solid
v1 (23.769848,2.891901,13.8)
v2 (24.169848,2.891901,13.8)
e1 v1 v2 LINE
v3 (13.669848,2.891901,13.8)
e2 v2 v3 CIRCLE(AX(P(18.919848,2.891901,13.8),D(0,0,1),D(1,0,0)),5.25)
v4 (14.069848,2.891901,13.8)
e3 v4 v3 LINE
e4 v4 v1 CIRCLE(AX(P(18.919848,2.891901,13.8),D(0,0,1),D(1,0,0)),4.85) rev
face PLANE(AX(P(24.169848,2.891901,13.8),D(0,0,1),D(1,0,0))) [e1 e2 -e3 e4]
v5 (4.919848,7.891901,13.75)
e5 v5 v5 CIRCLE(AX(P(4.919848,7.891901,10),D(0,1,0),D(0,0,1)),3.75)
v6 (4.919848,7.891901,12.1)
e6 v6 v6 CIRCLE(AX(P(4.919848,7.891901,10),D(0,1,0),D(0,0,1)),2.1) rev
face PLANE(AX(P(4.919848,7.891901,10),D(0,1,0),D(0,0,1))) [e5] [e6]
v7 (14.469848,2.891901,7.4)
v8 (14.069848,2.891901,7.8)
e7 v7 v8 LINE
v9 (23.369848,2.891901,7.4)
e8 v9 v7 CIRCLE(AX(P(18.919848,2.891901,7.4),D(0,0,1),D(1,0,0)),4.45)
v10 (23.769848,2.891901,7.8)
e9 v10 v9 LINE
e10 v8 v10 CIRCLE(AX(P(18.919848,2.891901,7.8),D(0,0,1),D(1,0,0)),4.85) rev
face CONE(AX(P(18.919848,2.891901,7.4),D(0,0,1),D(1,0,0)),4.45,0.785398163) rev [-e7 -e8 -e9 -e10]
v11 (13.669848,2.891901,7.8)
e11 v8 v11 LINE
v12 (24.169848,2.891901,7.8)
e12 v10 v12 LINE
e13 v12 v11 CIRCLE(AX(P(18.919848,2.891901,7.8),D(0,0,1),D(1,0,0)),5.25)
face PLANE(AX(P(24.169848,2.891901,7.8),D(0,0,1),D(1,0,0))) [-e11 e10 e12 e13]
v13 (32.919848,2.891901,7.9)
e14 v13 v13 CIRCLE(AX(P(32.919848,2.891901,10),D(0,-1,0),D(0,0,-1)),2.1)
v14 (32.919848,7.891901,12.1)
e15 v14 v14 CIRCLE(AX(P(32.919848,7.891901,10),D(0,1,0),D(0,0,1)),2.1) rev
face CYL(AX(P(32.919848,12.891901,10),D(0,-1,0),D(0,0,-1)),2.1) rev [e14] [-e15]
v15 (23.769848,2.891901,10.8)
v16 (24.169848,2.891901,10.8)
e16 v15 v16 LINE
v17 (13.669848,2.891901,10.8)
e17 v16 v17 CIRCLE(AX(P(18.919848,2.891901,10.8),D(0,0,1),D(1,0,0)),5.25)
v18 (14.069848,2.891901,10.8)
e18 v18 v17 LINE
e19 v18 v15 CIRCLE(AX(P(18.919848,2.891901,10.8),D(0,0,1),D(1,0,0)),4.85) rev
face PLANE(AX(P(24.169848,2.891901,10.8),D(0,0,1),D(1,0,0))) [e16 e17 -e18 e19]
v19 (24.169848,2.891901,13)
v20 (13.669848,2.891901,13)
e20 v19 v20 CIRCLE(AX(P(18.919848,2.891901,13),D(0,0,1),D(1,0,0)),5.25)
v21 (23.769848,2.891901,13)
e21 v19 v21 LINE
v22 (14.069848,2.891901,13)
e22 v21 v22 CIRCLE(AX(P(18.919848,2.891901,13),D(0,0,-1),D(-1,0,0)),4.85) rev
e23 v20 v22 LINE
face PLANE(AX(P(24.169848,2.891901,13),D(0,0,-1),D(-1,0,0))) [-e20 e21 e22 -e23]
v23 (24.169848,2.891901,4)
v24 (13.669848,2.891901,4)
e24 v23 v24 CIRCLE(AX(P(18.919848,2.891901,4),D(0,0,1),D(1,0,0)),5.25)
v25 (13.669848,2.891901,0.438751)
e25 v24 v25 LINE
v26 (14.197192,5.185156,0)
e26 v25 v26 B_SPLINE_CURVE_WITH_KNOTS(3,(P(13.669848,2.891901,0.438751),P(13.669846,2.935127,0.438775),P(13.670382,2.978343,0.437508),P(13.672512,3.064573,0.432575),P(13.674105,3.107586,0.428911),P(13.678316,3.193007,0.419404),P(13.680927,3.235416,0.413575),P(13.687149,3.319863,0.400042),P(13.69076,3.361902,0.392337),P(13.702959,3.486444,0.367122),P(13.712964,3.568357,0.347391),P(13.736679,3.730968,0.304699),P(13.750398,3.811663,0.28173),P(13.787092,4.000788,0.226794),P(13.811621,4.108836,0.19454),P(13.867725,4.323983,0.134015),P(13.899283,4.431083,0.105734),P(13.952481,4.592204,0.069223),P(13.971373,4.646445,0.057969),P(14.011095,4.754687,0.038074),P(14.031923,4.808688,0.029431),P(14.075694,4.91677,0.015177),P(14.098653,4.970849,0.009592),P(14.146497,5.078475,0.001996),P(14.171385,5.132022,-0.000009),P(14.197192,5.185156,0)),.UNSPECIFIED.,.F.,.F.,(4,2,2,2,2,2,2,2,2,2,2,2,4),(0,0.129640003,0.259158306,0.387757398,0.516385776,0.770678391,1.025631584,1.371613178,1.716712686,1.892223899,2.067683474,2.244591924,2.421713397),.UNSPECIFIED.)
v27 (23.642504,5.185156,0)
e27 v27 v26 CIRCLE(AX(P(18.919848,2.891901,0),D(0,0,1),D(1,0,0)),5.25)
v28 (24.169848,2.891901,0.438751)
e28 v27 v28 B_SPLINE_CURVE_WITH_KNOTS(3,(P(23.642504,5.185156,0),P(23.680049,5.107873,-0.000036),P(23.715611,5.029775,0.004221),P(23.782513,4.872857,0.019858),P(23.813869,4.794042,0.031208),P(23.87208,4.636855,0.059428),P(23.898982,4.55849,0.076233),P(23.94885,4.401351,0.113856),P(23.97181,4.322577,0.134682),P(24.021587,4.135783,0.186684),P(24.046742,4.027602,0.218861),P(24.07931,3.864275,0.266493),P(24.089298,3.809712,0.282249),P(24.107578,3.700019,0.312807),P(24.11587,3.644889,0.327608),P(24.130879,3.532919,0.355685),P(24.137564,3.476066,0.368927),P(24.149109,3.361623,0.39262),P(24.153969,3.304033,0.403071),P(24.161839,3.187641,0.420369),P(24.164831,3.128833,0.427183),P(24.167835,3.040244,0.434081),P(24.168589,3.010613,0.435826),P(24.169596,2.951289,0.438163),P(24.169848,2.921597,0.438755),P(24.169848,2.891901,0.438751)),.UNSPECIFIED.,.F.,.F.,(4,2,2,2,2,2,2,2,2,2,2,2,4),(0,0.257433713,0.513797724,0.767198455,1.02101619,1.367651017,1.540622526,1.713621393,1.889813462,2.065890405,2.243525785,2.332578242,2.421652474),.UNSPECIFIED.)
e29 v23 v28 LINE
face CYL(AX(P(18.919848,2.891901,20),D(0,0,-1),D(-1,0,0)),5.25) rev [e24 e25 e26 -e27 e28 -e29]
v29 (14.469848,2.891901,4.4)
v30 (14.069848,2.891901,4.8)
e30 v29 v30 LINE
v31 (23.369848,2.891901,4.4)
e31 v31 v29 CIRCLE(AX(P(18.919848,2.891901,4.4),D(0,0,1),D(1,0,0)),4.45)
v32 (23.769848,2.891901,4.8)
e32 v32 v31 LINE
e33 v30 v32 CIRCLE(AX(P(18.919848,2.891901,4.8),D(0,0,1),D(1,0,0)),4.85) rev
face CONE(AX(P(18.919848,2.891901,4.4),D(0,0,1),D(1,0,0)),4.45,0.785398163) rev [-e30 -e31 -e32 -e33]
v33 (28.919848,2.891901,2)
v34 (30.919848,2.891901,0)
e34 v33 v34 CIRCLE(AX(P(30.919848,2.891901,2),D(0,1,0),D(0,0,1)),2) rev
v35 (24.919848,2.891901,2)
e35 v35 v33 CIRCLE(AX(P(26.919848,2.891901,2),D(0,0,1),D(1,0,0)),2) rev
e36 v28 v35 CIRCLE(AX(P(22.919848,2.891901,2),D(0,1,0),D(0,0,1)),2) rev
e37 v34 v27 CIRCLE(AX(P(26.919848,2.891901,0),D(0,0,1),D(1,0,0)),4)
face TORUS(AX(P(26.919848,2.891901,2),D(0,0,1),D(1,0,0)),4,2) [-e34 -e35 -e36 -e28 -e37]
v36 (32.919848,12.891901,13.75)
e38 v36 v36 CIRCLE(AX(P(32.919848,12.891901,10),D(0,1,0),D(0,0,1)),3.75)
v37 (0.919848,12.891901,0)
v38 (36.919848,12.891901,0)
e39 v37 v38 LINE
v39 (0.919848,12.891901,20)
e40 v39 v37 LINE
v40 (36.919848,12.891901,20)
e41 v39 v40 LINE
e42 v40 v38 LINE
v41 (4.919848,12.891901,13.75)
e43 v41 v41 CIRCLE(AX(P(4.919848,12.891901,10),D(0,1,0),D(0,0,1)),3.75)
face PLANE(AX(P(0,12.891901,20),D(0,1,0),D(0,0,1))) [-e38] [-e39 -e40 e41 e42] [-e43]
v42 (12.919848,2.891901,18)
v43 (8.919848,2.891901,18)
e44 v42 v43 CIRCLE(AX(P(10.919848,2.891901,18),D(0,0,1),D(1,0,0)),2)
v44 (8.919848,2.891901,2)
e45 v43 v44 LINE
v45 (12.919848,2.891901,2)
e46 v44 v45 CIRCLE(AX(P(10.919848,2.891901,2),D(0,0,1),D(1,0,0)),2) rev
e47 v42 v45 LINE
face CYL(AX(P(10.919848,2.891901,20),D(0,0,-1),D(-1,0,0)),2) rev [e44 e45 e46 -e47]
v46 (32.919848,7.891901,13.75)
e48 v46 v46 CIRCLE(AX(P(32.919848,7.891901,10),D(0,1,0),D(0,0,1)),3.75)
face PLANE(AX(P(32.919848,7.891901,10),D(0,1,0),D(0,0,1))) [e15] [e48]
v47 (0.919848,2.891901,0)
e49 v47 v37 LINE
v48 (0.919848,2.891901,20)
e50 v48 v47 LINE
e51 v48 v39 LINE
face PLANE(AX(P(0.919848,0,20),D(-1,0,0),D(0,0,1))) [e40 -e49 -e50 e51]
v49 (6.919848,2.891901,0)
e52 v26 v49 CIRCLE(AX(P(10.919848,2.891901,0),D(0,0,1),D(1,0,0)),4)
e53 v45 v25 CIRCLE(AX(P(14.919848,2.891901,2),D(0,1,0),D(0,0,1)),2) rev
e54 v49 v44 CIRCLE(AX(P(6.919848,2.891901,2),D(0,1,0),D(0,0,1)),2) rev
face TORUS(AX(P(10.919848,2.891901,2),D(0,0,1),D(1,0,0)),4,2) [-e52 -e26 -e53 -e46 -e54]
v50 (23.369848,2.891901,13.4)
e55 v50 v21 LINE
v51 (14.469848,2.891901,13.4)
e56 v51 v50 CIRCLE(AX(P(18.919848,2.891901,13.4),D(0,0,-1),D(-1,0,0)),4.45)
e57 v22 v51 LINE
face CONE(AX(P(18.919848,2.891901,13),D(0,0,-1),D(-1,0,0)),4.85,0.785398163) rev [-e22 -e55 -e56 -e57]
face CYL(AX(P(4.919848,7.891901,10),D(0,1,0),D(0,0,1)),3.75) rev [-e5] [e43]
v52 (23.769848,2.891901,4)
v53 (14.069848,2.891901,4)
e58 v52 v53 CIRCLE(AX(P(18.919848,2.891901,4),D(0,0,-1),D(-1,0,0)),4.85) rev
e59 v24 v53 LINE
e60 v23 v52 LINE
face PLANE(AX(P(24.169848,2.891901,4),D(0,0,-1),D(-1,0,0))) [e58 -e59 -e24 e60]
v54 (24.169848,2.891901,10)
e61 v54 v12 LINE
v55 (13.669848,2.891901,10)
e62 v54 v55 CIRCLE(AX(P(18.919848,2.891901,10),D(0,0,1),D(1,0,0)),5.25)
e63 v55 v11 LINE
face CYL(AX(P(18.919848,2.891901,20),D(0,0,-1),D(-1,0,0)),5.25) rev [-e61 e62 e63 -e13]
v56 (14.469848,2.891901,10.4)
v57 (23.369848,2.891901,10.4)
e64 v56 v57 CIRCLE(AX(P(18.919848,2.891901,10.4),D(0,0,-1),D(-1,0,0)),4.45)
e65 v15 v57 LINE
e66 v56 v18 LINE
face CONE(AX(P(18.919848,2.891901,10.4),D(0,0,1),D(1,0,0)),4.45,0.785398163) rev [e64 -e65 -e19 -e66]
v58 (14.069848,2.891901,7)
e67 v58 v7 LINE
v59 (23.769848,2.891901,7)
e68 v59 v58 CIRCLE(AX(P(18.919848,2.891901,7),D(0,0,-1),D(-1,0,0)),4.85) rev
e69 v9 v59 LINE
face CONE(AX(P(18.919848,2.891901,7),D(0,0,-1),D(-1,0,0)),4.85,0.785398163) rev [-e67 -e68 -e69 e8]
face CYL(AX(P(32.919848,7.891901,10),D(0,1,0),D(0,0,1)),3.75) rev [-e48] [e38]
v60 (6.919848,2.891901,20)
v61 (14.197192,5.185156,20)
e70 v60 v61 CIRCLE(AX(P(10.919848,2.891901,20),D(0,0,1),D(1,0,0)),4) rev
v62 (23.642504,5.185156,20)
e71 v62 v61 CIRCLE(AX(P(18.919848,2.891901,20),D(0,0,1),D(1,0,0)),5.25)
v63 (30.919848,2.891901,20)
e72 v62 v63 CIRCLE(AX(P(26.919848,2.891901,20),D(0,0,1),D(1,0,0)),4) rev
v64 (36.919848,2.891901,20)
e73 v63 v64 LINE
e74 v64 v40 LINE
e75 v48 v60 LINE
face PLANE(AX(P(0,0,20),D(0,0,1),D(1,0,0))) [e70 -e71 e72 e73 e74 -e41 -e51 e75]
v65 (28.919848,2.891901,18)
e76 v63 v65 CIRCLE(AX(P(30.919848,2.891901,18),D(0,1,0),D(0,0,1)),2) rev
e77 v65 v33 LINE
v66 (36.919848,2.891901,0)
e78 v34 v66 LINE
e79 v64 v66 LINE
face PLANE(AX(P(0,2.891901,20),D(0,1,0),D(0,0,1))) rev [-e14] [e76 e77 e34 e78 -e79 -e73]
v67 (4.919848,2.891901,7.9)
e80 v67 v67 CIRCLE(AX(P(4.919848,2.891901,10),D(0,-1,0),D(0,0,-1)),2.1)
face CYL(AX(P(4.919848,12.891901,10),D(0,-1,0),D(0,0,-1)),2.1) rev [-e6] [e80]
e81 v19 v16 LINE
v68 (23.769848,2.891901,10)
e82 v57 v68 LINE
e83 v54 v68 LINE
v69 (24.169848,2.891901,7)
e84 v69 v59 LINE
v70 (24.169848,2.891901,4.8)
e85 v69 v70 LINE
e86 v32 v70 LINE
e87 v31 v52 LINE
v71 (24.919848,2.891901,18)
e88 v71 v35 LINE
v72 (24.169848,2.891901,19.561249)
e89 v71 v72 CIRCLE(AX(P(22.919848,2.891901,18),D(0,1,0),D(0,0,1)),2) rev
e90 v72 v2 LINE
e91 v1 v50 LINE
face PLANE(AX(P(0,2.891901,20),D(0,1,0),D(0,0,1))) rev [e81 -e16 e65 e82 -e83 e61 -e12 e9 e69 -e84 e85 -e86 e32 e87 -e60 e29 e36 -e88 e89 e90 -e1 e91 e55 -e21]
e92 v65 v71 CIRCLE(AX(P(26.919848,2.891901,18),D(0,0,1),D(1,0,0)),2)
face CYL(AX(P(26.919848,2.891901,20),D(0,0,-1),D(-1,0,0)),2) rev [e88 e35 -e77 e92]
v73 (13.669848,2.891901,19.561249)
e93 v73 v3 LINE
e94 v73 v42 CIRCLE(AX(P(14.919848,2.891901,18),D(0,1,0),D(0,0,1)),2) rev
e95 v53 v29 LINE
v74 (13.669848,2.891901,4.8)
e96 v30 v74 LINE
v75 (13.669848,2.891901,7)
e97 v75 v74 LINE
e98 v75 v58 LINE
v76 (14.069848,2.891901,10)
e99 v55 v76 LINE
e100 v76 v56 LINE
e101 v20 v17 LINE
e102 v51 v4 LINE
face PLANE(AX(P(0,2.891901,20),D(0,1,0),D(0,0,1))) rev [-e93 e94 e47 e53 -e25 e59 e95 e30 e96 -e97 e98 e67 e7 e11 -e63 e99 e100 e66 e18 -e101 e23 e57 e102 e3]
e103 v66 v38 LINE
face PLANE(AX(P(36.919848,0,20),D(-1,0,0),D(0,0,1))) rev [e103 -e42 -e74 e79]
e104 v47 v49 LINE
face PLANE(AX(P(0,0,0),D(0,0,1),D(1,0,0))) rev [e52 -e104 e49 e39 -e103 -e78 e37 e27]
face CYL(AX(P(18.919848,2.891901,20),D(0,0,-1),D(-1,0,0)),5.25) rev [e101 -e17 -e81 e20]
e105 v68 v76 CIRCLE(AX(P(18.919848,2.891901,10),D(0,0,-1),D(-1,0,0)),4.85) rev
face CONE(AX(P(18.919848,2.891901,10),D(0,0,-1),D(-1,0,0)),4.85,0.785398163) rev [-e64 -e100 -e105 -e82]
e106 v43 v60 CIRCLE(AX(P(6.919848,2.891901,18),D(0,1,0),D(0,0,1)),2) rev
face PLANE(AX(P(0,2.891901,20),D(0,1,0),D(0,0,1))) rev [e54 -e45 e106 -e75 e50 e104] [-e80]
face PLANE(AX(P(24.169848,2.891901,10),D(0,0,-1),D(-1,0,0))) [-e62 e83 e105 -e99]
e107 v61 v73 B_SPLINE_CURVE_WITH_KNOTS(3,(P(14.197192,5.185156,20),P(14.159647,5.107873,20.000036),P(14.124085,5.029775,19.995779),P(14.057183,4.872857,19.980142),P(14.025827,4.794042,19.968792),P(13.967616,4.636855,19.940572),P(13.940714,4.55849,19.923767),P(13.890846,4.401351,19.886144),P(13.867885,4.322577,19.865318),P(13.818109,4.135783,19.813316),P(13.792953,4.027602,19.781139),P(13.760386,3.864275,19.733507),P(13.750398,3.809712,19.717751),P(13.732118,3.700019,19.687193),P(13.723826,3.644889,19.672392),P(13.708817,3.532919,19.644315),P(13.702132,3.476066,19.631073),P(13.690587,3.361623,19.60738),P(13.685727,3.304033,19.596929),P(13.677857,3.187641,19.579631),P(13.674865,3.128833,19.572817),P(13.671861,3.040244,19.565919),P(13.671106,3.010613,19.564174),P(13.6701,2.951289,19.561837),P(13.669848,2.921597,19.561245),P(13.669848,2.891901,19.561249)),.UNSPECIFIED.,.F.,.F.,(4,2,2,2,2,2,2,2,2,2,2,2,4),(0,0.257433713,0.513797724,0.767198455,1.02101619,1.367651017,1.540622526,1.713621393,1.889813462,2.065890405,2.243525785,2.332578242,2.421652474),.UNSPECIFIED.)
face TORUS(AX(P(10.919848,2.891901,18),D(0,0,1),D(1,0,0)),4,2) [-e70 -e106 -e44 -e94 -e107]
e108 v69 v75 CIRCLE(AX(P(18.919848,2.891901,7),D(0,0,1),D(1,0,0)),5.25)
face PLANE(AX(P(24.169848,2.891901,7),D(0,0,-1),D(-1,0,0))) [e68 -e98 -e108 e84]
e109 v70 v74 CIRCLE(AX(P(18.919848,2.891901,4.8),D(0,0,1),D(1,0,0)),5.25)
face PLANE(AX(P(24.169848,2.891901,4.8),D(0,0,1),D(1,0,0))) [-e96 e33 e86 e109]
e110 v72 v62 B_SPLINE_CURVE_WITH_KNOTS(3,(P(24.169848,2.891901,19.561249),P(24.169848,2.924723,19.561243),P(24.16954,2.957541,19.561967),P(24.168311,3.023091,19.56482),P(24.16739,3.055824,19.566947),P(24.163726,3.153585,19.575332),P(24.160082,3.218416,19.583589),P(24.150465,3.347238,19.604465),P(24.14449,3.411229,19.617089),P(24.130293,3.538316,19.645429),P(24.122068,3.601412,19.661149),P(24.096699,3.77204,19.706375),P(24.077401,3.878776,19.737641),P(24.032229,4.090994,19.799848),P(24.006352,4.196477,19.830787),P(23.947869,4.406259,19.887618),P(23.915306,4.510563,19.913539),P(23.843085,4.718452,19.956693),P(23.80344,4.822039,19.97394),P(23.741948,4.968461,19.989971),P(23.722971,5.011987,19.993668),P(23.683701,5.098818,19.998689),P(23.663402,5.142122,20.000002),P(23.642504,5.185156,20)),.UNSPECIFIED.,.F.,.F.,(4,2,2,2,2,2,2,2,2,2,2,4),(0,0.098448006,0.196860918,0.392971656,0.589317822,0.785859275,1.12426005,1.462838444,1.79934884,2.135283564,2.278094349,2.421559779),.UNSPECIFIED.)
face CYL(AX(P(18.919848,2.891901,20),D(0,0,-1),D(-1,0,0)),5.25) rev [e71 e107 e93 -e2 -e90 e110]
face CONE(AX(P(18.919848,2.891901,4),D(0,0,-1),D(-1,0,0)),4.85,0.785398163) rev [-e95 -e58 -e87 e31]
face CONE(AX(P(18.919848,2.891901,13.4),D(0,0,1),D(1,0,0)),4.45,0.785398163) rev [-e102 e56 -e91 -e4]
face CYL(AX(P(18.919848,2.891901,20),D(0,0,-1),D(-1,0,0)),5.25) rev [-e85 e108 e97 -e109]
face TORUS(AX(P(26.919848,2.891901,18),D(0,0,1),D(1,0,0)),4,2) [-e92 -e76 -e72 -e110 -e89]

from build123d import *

# Parameters (mm, degrees)
BOSS_EXTRUDE1_DEPTH = 20
SKETCH2_W           = 0.8000000000000007
SKETCH2_H           = 0.7999999999999989
SKETCH2_H_2         = 0.8000000000000007
CHAMFER1_SIZE       = 0.4
FILLET2_R           = 2
SKETCH3_R           = 2.100000000000004
SKETCH3_R_2         = 2.100000000000001
CUT_EXTRUDE1_DEPTH  = 44.163354633534205
SKETCH4_R           = 3.7499999999999996
SKETCH4_R_2         = 3.750000000000006
CUT_EXTRUDE2_DEPTH  = 5


# Some blends are built 0.0001 mm under size
with BuildPart() as part:
    # Sketch1 → Boss-Extrude1 (new body)
    with BuildSketch(Plane.XY):
        with BuildLine():
            Line((0.9198479389646088, 12.89190109356241), (0.9198479389646088, 2.89190109356241))
            Line((0.9198479389646081, 2.89190109356241), (8.919847938964608, 2.89190109356241))
            ThreePointArc((8.919847938964608, 2.8919010935624105), (10.919847938964608, 4.89190109356241), (12.919847938964608, 2.89190109356241))
            Line((12.919847938964608, 2.89190109356241), (13.669847938964606, 2.89190109356241))
            ThreePointArc((13.669847938964608, 2.8919010935624114), (18.919847938964608, 8.14190109356241), (24.169847938964608, 2.89190109356241))
            Line((24.169847938964608, 2.89190109356241), (24.919847938964608, 2.89190109356241))
            ThreePointArc((24.919847938964608, 2.8919010935624105), (26.919847938964608, 4.891901093562406), (28.919847938964608, 2.89190109356241))
            Line((28.919847938964605, 2.89190109356241), (36.91984793896461, 2.89190109356241))
            Line((36.91984793896461, 2.89190109356241), (36.91984793896461, 12.89190109356241))
            Line((36.91984793896461, 12.89190109356241), (0.9198479389646088, 12.89190109356241))
        make_face()
    extrude(amount=BOSS_EXTRUDE1_DEPTH)

    # Sweep2: sweep along a curve in space
    with BuildLine() as sweep2_path:
        ThreePointArc((24.169847938964608, 2.89190109356241, 20), (22.632158540193984, 6.604211694791784, 20), (18.919847938964608, 8.141901093562412, 20))
        ThreePointArc((18.919847938964608, 8.141901093562412, 20), (15.207537337735232, 6.604211694791786, 20), (13.669847938964606, 2.89190109356241, 20))
    # Sketch2 → Sweep2 (sweep)
    with BuildSketch(Plane.XZ.offset(-2.89190109356241)):
        with Locations((14.069847938964607, 13.400000000000006)):
            Rectangle(SKETCH2_W, SKETCH2_H)
        with Locations((14.069847938964607, 10.400000000000004)):
            Rectangle(SKETCH2_W, SKETCH2_H_2)
        with Locations((14.069847938964607, 7.400000000000003)):
            Rectangle(SKETCH2_W, SKETCH2_H_2)
        Polygon((13.669847938964608, 4.8000000000000025), (14.469847938964607, 4.8000000000000025), (14.469847938964609, 4.000000000000002), (13.669847938964608, 4.000000000000002), align=None)
    sweep(path=sweep2_path.line)

    # Chamfer1
    chamfer1_edges = [part.edges().sort_by_distance(p)[0] for p in [
        (18.919847938964608, 7.341901093562408, 4.000000000000002),
        (18.919847938964608, 7.341901093562411, 4.8000000000000025),
        (18.919847938964608, 7.341901093562411, 7.0000000000000036),
        (18.919847938964608, 7.341901093562413, 7.800000000000004),
        (18.919847938964608, 7.341901093562413, 13.800000000000004),
        (18.919847938964608, 7.341901093562411, 13.000000000000005),
        (18.919847938964608, 7.341901093562413, 10.800000000000004),
        (18.919847938964608, 7.341901093562411, 10.000000000000004),
    ]]
    chamfer(chamfer1_edges, length=CHAMFER1_SIZE - 0.0001)  # a hair under: the kernel refuses the full size

    # Fillet2
    # the kernel refuses this fillet: 2 mm, written as the material it takes off along each edge
    with BuildSketch(Plane(origin=(10.919847938964608, 2.89190109356241, 0), x_dir=(-0.003141587485879782, -0.9999950652018582, 0), z_dir=(0.9999950652018582, -0.003141587485879782, 0))) as fillet2_piece_1:
        with BuildLine():
            CenterArc((2 + FILLET2_R, -FILLET2_R), FILLET2_R, 89.99999999999997, 90)
            Line((2 + FILLET2_R, 2.2e-16), (2, 0))
            Line((2, 0), (2, -FILLET2_R))
        make_face()
    revolve(axis=Axis((10.919847938964608, 2.89190109356241, 0), (0, 0, -1)), revolution_arc=359.64000000000004, mode=Mode.SUBTRACT)
    with BuildSketch(Plane(origin=(26.919847938964608, 2.8919010935624057, 0), x_dir=(-0.003141587485879782, -0.9999950652018582, 0), z_dir=(0.9999950652018582, -0.003141587485879782, 0))) as fillet2_piece_2:
        with BuildLine():
            CenterArc((1.9999999999999987 + FILLET2_R, -FILLET2_R), FILLET2_R, 90, 90)
            Line((1.999999999999998, -FILLET2_R), (1.9999999999999987, 0))
            Line((1.9999999999999987, 0), (1.9999999999999987 + FILLET2_R, 0))
        make_face()
    revolve(axis=Axis((26.919847938964608, 2.8919010935624057, 0), (0, 0, -1)), revolution_arc=359.64, mode=Mode.SUBTRACT)
    with BuildSketch(Plane(origin=(10.919847938964608, 2.89190109356241, 20), x_dir=(-0.003141587485879782, -0.9999950652018582, 0), z_dir=(0.9999950652018582, -0.003141587485879782, 0))) as fillet2_piece_3:
        with BuildLine():
            CenterArc((1.9999999999999987 + FILLET2_R, FILLET2_R), FILLET2_R, 180, 90)
            Line((1.999999999999999, FILLET2_R), (1.9999999999999987, 0))
            Line((1.9999999999999987, 0), (1.9999999999999987 + FILLET2_R, 0))
        make_face()
    revolve(axis=Axis((10.919847938964608, 2.89190109356241, 20), (0, 0, -1)), revolution_arc=359.64000000000004, mode=Mode.SUBTRACT)
    with BuildSketch(Plane(origin=(26.919847938964608, 2.8919010935624057, 20), x_dir=(-0.003141587485879782, -0.9999950652018582, 0), z_dir=(0.9999950652018582, -0.003141587485879782, 0))) as fillet2_piece_4:
        with BuildLine():
            CenterArc((1.9999999999999987 + FILLET2_R, FILLET2_R), FILLET2_R, 180, 90)
            Line((1.999999999999998, FILLET2_R), (1.9999999999999987, 0))
            Line((1.9999999999999987, 0), (1.9999999999999987 + FILLET2_R, 0))
        make_face()
    revolve(axis=Axis((26.919847938964608, 2.8919010935624057, 20), (0, 0, -1)), revolution_arc=359.64, mode=Mode.SUBTRACT)

    # Sketch3 → Cut-Extrude1 (cut, through all)
    with BuildSketch(Plane.XZ.offset(-2.89190109356241)):
        with Locations(Location((32.9198479389646, 10, 0), (0, 0, 270))):
            Circle(SKETCH3_R)
        with Locations(Location((4.919847938964609, 10, 0), (0, 0, 270))):
            Circle(SKETCH3_R_2)
    extrude(amount=-CUT_EXTRUDE1_DEPTH, mode=Mode.SUBTRACT)

    # Sketch4 → Cut-Extrude2 (cut)
    with BuildSketch(Plane(origin=(0, 12.89190109356241, 0), x_dir=(1, 0, 0), z_dir=(0, 1, 0))):
        with Locations(Location((4.919847938964609, -10, 0), (0, 0, 270))):
            Circle(SKETCH4_R)
        with Locations(Location((32.9198479389646, -10, 0), (0, 0, 270))):
            Circle(SKETCH4_R_2)
    extrude(amount=-CUT_EXTRUDE2_DEPTH, mode=Mode.SUBTRACT)


solid = part.part
